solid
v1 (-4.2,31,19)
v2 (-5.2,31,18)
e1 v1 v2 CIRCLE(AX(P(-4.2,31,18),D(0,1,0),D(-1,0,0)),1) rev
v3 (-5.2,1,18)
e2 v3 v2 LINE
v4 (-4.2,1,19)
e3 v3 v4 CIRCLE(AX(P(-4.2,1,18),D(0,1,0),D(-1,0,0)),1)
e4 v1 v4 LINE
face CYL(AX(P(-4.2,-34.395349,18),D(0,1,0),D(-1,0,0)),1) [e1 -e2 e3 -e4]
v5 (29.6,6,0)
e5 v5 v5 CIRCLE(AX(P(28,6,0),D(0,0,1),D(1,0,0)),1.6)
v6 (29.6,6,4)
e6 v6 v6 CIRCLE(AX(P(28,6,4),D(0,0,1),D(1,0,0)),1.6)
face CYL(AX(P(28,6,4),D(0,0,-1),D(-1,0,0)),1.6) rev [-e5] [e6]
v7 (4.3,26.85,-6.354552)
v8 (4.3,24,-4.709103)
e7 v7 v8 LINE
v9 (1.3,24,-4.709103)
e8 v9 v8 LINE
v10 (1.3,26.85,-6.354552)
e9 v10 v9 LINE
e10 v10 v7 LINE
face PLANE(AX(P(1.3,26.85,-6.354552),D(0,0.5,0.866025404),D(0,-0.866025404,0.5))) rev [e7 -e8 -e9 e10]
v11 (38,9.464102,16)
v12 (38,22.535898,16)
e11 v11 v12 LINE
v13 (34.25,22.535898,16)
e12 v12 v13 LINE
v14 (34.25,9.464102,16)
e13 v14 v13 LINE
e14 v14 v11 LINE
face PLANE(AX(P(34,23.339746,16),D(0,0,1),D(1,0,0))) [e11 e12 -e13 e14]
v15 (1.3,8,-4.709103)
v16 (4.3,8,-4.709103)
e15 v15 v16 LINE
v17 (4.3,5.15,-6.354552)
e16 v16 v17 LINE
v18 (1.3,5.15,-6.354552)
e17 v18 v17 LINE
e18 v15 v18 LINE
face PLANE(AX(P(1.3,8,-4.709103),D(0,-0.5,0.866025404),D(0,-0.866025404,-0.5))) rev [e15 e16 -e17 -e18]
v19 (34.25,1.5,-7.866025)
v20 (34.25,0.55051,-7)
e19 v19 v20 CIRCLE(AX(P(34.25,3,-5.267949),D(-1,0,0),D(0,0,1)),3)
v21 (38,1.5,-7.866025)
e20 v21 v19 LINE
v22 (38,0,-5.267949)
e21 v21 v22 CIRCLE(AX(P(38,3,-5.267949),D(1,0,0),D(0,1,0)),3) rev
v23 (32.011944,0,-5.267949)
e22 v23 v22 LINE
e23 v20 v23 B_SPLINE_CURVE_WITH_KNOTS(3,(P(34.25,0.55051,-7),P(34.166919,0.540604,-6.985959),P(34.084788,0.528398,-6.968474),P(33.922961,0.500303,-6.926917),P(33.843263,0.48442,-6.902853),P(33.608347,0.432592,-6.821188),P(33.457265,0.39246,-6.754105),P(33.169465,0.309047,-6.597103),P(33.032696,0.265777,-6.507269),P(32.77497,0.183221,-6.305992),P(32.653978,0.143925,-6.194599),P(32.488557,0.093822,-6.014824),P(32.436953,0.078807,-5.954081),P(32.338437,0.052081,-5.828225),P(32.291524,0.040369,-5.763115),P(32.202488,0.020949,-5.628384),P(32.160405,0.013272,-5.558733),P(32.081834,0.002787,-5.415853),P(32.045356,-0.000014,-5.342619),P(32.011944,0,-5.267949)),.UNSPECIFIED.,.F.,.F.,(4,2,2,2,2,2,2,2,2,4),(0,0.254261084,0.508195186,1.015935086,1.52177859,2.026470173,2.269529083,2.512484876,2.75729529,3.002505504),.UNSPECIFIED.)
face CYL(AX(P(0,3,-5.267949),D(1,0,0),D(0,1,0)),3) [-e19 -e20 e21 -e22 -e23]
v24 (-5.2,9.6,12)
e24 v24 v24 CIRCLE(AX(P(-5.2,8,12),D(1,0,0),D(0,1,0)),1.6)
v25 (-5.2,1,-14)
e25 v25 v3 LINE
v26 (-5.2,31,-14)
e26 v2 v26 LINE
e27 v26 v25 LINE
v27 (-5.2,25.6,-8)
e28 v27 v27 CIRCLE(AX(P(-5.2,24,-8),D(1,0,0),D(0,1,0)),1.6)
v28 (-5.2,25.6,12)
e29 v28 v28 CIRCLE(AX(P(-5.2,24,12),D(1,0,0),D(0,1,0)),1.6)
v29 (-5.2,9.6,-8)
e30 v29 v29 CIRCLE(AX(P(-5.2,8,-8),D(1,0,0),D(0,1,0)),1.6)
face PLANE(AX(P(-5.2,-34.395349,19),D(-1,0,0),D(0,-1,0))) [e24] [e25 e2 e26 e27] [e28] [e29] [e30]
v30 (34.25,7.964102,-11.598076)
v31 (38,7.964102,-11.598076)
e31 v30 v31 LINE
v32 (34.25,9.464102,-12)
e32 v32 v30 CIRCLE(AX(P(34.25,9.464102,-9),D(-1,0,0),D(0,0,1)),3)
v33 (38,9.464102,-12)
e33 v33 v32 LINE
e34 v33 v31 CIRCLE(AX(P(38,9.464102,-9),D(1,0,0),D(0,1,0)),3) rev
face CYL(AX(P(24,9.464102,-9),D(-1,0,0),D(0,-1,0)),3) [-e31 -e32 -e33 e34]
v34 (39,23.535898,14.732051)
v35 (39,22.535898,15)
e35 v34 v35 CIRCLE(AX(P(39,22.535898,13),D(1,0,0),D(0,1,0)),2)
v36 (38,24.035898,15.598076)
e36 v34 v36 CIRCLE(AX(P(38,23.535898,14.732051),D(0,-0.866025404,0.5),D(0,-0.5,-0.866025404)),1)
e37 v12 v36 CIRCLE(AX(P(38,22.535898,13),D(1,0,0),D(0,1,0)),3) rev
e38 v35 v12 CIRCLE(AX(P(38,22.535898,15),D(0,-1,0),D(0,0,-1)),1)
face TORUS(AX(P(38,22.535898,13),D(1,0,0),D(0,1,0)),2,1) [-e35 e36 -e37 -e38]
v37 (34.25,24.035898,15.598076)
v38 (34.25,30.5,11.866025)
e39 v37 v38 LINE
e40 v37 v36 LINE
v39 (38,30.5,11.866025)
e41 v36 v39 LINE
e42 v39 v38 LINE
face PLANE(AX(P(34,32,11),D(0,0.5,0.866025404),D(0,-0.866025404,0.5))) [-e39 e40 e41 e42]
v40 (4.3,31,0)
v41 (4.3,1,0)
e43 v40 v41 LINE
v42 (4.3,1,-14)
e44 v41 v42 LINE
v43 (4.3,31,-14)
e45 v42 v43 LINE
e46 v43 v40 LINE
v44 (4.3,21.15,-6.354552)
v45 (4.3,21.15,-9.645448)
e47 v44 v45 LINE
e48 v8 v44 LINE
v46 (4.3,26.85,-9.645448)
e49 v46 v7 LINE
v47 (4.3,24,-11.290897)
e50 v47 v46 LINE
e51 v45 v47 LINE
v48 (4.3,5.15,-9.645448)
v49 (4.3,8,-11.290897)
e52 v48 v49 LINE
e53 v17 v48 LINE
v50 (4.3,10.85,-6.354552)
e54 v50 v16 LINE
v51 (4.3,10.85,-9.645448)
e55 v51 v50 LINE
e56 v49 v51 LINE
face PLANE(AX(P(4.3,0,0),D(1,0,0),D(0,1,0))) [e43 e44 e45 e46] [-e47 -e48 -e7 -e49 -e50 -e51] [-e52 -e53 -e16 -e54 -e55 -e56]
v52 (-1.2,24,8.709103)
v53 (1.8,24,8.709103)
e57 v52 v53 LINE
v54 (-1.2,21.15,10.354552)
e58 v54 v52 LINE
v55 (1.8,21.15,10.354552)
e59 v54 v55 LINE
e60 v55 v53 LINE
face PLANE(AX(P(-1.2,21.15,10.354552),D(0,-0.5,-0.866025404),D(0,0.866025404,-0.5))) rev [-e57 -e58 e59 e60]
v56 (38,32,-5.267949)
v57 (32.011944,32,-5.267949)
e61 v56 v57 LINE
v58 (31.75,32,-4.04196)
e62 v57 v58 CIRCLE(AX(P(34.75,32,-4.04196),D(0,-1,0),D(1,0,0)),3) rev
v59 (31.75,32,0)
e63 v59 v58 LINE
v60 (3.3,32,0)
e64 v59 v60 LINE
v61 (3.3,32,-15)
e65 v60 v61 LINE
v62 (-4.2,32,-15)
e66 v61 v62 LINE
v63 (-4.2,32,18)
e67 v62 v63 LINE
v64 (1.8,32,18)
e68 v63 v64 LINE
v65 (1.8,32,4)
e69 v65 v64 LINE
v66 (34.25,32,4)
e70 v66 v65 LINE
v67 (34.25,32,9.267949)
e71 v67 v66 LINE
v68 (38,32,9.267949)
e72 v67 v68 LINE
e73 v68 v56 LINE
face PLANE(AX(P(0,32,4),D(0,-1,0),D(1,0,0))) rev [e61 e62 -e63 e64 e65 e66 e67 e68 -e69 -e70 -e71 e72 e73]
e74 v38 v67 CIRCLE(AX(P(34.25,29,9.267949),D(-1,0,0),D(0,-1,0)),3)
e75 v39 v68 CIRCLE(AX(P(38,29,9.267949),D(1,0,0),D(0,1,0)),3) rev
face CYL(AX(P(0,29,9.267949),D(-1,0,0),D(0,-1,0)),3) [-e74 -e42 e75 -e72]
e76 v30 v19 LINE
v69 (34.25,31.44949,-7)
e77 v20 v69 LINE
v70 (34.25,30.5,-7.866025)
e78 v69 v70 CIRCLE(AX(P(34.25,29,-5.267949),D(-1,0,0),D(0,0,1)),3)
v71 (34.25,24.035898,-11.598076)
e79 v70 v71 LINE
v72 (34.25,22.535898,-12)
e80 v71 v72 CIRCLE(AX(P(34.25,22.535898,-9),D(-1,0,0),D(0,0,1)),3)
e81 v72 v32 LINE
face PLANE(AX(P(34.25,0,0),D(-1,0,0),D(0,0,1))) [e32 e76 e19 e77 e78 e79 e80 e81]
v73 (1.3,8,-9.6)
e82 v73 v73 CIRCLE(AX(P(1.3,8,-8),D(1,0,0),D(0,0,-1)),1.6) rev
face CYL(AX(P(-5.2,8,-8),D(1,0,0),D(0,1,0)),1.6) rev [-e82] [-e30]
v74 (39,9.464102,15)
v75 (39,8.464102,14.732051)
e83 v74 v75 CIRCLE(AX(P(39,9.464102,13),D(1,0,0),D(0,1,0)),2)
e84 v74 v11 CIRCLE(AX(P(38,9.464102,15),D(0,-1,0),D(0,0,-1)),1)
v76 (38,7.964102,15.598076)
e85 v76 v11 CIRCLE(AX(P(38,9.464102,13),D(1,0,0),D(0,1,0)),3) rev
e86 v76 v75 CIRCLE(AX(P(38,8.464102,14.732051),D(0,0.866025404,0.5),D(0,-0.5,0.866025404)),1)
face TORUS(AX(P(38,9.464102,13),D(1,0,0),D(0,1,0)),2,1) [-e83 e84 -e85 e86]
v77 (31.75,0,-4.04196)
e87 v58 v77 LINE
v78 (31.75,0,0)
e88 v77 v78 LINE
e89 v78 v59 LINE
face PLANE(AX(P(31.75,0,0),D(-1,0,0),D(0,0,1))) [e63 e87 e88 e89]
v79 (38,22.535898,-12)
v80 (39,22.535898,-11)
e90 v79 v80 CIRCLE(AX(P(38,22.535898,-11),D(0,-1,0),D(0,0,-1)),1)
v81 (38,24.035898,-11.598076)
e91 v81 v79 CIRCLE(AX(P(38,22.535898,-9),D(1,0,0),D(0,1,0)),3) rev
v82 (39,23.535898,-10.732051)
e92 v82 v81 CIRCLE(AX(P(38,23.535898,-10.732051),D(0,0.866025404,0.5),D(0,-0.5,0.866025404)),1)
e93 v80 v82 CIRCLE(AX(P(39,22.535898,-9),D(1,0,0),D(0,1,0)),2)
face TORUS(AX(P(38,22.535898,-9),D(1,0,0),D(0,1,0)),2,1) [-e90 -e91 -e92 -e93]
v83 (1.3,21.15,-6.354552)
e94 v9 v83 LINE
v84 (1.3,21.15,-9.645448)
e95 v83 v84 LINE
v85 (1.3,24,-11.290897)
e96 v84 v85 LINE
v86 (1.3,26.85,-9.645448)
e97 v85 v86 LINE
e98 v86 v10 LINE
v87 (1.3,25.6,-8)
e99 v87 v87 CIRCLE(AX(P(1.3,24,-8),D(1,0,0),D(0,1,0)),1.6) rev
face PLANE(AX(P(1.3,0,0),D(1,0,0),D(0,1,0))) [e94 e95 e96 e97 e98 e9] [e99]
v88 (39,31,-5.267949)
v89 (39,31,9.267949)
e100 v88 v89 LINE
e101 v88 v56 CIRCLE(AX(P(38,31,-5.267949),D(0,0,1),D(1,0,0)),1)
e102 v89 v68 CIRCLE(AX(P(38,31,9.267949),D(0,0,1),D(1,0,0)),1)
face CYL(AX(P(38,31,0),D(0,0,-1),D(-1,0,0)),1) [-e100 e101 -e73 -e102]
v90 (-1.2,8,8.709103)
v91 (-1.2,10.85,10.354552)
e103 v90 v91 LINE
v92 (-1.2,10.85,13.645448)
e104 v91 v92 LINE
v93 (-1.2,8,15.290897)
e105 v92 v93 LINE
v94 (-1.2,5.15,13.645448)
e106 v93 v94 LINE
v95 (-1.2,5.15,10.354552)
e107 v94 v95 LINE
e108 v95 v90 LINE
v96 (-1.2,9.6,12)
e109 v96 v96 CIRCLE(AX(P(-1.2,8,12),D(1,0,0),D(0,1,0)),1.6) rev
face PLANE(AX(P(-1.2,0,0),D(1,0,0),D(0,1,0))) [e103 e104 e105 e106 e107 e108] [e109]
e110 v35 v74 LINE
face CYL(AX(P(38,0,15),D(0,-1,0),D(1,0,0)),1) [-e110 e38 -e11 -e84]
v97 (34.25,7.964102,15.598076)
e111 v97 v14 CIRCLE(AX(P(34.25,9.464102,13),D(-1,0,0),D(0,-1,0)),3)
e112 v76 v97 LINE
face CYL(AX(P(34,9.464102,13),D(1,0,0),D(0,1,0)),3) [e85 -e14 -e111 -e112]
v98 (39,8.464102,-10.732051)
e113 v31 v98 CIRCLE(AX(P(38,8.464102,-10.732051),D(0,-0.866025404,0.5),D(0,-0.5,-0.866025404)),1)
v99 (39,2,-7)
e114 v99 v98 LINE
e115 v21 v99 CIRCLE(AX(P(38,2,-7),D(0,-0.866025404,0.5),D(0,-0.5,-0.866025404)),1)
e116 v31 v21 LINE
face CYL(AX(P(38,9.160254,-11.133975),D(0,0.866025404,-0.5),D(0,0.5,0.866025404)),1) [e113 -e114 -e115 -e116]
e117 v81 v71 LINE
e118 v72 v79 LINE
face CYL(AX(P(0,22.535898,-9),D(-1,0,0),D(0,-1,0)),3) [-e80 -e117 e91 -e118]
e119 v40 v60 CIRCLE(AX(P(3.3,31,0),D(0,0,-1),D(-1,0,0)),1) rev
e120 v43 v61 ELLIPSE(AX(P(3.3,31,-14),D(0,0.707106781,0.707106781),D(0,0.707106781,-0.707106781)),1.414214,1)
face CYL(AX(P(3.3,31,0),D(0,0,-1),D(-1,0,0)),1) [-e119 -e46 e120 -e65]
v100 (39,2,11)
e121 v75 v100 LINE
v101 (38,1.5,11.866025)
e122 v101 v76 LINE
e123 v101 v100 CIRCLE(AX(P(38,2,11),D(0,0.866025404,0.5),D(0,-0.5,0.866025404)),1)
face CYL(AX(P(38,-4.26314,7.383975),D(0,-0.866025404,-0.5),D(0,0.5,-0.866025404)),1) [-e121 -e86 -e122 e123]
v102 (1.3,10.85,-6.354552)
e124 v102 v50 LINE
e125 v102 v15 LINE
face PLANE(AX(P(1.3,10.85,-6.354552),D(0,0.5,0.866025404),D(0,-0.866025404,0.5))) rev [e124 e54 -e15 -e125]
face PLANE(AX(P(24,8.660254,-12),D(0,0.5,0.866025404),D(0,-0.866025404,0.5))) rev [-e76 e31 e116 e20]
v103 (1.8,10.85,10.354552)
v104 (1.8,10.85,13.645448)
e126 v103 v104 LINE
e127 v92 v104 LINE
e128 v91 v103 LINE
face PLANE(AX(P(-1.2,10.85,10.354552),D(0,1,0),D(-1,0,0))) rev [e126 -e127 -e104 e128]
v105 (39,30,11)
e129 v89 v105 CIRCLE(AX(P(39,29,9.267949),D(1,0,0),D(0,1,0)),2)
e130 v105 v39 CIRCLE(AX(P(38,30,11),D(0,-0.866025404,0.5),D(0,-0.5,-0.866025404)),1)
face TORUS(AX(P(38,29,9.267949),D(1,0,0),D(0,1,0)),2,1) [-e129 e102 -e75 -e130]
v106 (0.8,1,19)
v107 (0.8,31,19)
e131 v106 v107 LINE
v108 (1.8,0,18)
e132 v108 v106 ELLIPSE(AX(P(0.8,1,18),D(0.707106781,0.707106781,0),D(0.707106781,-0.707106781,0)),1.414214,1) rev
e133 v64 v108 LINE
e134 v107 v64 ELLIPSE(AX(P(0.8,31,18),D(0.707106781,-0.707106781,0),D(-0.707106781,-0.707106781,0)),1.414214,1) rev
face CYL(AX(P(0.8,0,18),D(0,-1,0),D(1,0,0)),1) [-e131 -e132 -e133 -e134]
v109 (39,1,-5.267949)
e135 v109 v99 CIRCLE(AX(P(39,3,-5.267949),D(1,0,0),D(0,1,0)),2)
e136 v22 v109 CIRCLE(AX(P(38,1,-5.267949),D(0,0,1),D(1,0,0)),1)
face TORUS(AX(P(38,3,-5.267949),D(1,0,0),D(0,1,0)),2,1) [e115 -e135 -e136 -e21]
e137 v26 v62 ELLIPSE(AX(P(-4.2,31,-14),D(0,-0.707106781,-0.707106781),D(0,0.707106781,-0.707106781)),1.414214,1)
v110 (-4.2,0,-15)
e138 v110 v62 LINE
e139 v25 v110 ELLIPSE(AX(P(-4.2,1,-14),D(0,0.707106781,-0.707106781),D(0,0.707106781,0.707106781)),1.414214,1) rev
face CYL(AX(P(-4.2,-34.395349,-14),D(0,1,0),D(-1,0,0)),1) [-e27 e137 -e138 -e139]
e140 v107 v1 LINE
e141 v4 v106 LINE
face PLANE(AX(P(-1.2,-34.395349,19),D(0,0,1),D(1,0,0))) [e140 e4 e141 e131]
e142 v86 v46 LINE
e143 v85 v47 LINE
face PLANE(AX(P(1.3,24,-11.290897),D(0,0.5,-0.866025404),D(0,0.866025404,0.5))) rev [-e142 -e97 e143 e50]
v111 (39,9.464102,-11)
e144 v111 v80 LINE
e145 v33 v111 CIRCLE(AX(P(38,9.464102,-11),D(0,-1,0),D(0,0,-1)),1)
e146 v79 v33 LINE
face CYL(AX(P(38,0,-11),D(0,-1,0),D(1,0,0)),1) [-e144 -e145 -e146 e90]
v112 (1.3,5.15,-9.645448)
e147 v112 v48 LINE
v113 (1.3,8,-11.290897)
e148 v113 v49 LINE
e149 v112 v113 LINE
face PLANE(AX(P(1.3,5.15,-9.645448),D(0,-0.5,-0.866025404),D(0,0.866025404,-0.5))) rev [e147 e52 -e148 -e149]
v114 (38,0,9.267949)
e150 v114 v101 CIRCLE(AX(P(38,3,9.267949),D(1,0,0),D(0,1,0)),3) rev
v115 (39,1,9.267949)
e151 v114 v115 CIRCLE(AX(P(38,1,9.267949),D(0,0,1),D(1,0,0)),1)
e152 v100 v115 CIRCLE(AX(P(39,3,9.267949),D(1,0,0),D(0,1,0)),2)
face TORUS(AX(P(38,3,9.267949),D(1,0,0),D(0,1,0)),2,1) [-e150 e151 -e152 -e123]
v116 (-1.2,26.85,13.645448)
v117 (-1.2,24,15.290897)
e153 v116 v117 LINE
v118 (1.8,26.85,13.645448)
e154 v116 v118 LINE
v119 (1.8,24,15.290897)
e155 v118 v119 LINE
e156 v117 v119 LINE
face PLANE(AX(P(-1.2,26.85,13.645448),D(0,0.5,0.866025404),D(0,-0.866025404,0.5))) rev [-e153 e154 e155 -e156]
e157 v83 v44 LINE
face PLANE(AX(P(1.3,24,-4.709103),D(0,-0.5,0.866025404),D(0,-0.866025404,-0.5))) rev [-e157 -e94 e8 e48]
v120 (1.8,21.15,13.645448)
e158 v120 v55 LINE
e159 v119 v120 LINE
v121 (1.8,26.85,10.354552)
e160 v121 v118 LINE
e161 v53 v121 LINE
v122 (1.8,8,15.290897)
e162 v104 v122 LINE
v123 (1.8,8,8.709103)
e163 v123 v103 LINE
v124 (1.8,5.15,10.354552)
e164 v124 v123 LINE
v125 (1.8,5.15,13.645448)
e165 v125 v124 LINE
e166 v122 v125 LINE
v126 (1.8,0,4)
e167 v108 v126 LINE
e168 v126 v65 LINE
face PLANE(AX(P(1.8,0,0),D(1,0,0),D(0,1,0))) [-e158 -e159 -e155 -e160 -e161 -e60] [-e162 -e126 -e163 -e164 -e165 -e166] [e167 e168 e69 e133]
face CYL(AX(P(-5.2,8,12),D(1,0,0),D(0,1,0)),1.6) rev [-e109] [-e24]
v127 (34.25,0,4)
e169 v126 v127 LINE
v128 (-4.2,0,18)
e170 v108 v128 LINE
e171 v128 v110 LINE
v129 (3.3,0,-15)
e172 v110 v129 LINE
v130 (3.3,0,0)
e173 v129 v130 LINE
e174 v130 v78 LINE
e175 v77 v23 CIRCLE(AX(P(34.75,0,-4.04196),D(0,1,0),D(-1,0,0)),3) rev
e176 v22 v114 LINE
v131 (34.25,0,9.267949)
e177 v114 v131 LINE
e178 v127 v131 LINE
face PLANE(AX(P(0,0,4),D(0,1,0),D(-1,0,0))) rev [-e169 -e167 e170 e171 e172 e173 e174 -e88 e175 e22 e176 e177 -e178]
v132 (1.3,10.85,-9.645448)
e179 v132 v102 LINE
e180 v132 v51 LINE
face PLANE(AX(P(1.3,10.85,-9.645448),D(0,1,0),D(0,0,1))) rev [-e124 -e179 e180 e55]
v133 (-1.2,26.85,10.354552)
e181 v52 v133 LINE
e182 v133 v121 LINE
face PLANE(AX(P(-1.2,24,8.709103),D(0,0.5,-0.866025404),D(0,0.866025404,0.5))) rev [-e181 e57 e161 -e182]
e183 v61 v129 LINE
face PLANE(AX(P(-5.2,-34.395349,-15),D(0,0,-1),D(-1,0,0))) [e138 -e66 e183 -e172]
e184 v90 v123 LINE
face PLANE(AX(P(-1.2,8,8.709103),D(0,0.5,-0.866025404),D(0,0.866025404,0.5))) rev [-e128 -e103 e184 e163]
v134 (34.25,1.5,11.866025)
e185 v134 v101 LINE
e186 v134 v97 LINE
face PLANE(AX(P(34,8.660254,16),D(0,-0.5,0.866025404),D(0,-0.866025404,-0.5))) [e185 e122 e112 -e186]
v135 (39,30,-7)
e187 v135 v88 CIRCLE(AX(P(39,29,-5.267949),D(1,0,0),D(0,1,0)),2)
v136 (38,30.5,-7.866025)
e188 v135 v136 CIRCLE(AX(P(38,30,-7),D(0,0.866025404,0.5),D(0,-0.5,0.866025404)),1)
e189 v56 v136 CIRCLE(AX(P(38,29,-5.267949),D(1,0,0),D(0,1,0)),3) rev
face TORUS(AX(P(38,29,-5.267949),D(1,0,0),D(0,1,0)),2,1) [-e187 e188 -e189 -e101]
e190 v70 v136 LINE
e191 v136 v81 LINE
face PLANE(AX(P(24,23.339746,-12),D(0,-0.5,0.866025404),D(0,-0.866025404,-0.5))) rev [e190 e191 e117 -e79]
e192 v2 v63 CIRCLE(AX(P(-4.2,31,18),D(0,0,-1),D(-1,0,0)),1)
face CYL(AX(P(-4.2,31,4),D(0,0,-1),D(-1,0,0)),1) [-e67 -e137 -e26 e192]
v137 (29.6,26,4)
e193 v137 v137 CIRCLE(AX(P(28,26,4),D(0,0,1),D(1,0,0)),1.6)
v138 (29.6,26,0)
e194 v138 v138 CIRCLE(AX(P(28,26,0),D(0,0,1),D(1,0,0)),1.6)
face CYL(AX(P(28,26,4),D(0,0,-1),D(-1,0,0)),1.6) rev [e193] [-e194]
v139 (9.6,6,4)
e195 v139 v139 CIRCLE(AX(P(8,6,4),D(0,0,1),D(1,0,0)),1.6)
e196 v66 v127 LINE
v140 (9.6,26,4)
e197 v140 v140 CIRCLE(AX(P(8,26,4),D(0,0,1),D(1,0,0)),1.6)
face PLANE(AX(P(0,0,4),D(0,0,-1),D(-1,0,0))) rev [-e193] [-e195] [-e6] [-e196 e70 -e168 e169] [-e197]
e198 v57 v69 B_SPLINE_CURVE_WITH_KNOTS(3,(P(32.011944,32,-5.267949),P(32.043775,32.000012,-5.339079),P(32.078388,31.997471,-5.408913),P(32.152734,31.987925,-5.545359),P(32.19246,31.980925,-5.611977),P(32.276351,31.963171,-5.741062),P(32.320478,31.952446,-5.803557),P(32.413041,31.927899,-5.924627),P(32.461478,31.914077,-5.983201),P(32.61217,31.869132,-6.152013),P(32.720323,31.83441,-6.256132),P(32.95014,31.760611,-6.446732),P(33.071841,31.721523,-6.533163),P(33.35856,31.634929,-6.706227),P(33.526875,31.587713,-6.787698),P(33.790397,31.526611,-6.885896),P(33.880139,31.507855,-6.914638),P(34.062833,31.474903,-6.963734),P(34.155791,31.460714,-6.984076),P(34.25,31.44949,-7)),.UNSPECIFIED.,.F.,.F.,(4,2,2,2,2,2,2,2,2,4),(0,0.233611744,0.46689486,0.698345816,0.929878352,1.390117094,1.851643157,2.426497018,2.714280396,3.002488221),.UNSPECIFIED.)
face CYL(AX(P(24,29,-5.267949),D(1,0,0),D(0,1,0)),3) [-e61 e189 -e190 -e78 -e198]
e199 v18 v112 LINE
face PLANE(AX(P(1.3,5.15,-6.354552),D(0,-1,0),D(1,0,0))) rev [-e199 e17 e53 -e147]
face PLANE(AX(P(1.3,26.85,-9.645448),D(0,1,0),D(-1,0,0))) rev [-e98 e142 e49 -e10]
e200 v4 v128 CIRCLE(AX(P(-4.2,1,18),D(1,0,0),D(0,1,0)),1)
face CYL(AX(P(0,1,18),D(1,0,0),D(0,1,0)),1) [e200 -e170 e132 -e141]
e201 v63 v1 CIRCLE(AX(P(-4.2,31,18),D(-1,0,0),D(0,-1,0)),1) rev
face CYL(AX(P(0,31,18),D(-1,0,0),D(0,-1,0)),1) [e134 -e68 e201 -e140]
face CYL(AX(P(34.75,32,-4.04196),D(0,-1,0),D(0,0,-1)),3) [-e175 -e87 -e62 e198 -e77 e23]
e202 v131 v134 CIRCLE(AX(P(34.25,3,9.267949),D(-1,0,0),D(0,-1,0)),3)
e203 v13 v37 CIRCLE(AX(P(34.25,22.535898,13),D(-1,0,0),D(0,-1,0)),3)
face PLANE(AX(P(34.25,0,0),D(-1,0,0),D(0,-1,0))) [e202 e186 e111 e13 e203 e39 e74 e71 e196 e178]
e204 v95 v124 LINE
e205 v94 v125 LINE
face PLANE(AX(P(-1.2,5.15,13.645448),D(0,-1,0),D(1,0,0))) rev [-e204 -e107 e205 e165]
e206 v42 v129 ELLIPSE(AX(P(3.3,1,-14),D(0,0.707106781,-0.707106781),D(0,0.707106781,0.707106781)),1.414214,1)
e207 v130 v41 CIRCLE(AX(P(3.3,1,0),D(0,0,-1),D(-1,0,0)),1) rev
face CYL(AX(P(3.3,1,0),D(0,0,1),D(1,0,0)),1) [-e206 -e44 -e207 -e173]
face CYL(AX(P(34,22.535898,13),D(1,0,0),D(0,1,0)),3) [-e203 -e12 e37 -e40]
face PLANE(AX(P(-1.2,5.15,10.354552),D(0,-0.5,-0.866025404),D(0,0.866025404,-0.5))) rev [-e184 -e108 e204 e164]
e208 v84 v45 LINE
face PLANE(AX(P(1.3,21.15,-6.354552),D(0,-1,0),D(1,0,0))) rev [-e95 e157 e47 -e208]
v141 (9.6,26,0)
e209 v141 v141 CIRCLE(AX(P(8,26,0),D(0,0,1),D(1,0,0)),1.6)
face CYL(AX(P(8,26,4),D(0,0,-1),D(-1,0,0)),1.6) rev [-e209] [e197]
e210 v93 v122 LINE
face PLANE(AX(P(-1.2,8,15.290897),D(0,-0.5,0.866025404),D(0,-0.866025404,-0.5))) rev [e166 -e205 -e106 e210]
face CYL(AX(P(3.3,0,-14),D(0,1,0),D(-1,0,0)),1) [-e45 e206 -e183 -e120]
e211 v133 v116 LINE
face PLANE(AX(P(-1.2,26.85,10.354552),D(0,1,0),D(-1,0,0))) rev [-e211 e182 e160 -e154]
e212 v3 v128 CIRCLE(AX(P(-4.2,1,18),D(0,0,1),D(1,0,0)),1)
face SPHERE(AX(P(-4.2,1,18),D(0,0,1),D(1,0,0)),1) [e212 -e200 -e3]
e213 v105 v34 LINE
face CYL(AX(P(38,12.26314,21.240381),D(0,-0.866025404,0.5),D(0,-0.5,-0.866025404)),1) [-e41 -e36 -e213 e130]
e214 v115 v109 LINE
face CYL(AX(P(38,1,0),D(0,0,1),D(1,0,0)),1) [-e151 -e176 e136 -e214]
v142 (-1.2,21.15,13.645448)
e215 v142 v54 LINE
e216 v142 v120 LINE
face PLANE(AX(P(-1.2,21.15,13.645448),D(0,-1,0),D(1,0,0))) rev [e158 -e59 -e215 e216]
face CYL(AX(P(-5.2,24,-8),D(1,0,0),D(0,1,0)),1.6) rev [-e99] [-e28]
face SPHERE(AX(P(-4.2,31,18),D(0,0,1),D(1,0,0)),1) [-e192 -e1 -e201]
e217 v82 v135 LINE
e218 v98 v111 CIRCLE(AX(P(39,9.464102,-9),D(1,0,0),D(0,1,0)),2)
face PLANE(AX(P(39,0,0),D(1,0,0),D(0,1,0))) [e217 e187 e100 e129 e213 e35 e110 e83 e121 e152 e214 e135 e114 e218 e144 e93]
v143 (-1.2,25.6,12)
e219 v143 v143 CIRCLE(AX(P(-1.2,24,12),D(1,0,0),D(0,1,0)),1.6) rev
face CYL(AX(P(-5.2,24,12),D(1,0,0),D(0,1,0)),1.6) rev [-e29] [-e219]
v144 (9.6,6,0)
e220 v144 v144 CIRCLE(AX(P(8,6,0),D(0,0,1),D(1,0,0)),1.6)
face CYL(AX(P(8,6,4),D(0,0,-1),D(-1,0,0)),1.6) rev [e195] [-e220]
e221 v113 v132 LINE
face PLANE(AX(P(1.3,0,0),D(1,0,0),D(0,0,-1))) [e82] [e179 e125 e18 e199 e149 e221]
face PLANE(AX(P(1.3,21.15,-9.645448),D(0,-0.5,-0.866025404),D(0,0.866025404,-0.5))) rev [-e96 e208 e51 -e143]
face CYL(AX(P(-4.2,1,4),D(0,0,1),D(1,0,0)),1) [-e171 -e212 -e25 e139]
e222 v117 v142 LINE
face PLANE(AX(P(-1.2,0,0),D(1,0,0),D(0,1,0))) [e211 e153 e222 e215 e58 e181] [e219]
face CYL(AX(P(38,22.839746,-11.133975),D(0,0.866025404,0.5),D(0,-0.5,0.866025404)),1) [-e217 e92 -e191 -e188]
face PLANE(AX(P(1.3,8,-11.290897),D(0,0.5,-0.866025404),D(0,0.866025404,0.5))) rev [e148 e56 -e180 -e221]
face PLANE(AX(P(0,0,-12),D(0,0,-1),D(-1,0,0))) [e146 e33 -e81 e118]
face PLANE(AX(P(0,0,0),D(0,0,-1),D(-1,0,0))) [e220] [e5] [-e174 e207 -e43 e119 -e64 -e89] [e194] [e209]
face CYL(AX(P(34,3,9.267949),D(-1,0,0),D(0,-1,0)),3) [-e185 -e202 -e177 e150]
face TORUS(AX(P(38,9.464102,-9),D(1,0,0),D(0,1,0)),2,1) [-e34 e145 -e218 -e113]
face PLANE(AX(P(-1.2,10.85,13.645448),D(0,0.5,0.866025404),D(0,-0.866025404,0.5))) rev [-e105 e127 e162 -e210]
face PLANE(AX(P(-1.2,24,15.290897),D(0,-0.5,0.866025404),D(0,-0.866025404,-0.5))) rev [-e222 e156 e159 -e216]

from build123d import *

# Parameters (mm, degrees)
SKETCH_1_W          = 36
SKETCH_1_H          = 32
SKETCH_1_R          = 1.6
EXTRUDE_1_DEPTH     = 4
EXTRUDE_2_DEPTH     = 32
SKETCH_8_R          = 1.6
CUT_EXTRUDE_1_DEPTH = 53.619768148
SKETCH1_W           = 4
SKETCH1_H           = 32
BOSS_EXTRUDE1_DEPTH = 3
SKETCH2_W           = 5
SKETCH2_H           = 32
BOSS_EXTRUDE2_DEPTH = 12
CUT_EXTRUDE1_DEPTH  = 5
BOSS_EXTRUDE5_DEPTH = 5
BOSS_EXTRUDE6_START = 3
SKETCH7_W           = 15
SKETCH7_H           = 32
SKETCH7_R           = 1.6
BOSS_EXTRUDE6_DEPTH = 3
CUT_EXTRUDE2_DEPTH  = 0.25
BOSS_EXTRUDE7_START = 2.5
SKETCH9_W           = 15
SKETCH9_H           = 32
SKETCH9_R           = 1.6
BOSS_EXTRUDE7_DEPTH = 2.5
BOSS_EXTRUDE8_DEPTH = 2.5
CUT_EXTRUDE3_DEPTH  = 2.5
FILLET2_R           = 3
FILLET4_R           = 3
FILLET5_R           = 3
FILLET9_R           = 1
FILLET11_R          = 1
CUT_EXTRUDE4_DEPTH  = 3
CUT_EXTRUDE5_DEPTH  = 3
FILLET14_R          = 1


with BuildPart() as part:
    # Эскиз1 → Бобышка-Вытянуть1 (new body)
    with BuildSketch(Plane.XY):
        with Locations((18, 16)):
            Rectangle(SKETCH_1_W, SKETCH_1_H)
        with Locations((8, 26)):
            Circle(SKETCH_1_R, mode=Mode.SUBTRACT)
        with Locations((28, 26)):
            Circle(SKETCH_1_R, mode=Mode.SUBTRACT)
        with Locations((8, 6)):
            Circle(SKETCH_1_R, mode=Mode.SUBTRACT)
        with Locations((28, 6)):
            Circle(SKETCH_1_R, mode=Mode.SUBTRACT)
    extrude(amount=EXTRUDE_1_DEPTH)

    # Эскиз7 → Бобышка-Вытянуть2 (add)
    with BuildSketch(Plane(origin=(0, 32, 0), x_dir=(1, 0, 0), z_dir=(0, 1, 0))):
        Polygon((0, 0), (-1.2, 0), (-1.2, 15), (-5.2, 15), (-5.2, -19), (-1.2, -19), (-1.2, -4), (0, -4), align=None)
    extrude(amount=-EXTRUDE_2_DEPTH)

    # Эскиз8 → Вырез-Вытянуть1 (cut, through all)
    with BuildSketch(Plane(origin=(-1.2, 0, 0), x_dir=(0, 0, -1), z_dir=(1, 0, 0))):
        with Locations(Location((8, 24, 0), (0, 0, 90))):
            Circle(SKETCH_8_R)
        with Locations(Location((8, 8, 0), (0, 0, 90))):
            Circle(SKETCH_8_R)
        with Locations(Location((-12, 8, 0), (0, 0, 90))):
            Circle(SKETCH_8_R)
        with Locations(Location((-12, 24, 0), (0, 0, 90))):
            Circle(SKETCH_8_R)
    extrude(amount=-CUT_EXTRUDE_1_DEPTH, mode=Mode.SUBTRACT)

    # Sketch1 → Boss-Extrude1 (add)
    with BuildSketch(Plane(origin=(36, 0, 0), x_dir=(0, 0, -1), z_dir=(1, 0, 0))):
        with Locations((-2, 16)):
            Rectangle(SKETCH1_W, SKETCH1_H)
    extrude(amount=BOSS_EXTRUDE1_DEPTH)

    # Sketch2 → Boss-Extrude2 (add)
    with BuildSketch(Plane(origin=(0, 0, 0), x_dir=(-1, 0, 0), z_dir=(0, 0, -1))):
        with Locations((-36.5, 16)):
            Rectangle(SKETCH2_W, SKETCH2_H)
    extrude(amount=BOSS_EXTRUDE2_DEPTH)

    # Sketch3 → Cut-Extrude1 (cut)
    with BuildSketch(Plane(origin=(39, 0, 0), x_dir=(0, 0, -1), z_dir=(1, 0, 0))):
        Polygon((7, 32), (12, 32), (12, 23.339745962), align=None)
        Polygon((12, 8.660254038), (7, 0), (12, 0), align=None)
    extrude(amount=-CUT_EXTRUDE1_DEPTH, mode=Mode.SUBTRACT)

    # Sketch6 → Boss-Extrude5 (add)
    with BuildSketch(Plane(origin=(39, 0, 0), x_dir=(0, 0, -1), z_dir=(1, 0, 0))):
        Polygon((-16, 8.660254038), (-11, 0), (-4, 0), (-4, 32), (-11, 32), (-16, 23.339745962), align=None)
    extrude(amount=-BOSS_EXTRUDE5_DEPTH)

    # Sketch7 → Boss-Extrude6 (add)
    # profile 1 of 2: a face of its own
    with BuildSketch(Plane(origin=(-1.2, 0, 0), x_dir=(0, 0, -1), z_dir=(1, 0, 0)).offset(BOSS_EXTRUDE6_START)):
        with Locations((7.5, 16)):
            Rectangle(SKETCH7_W, SKETCH7_H)
        with Locations(Location((8, 24, 0), (0, 0, 90))):
            Circle(SKETCH7_R, mode=Mode.SUBTRACT)
        with Locations(Location((8, 8, 0), (0, 0, 90))):
            Circle(SKETCH7_R, mode=Mode.SUBTRACT)
    # profile 2 of 2: a face of its own
    with BuildSketch(Plane(origin=(-1.2, 0, 0), x_dir=(0, 0, -1), z_dir=(1, 0, 0)).offset(BOSS_EXTRUDE6_START)):
        with Locations((-11.5, 16)):
            Rectangle(SKETCH7_W, SKETCH7_H)
        with Locations(Location((-12, 24, 0), (0, 0, 90))):
            Circle(SKETCH7_R, mode=Mode.SUBTRACT)
        with Locations(Location((-12, 8, 0), (0, 0, 90))):
            Circle(SKETCH7_R, mode=Mode.SUBTRACT)
    extrude(amount=-BOSS_EXTRUDE6_DEPTH)

    # Sketch8 → Cut-Extrude2 (cut)
    with BuildSketch(Plane.ZY.offset(-34)):
        Polygon((-12, 23.339745962), (-12, 8.660254038), (-7, 0), (0, 0), (0, 32), (-7, 32), align=None)
        Polygon((4, 32), (4, 0), (11, 0), (16, 8.660254038), (16, 23.339745962), (11, 32), align=None)
    extrude(amount=-CUT_EXTRUDE2_DEPTH, mode=Mode.SUBTRACT)

    # Sketch9 → Boss-Extrude7 (add)
    with BuildSketch(Plane(origin=(1.8, 0, 0), x_dir=(0, 0, -1), z_dir=(1, 0, 0)).offset(BOSS_EXTRUDE7_START)):
        with Locations((7.5, 16)):
            Rectangle(SKETCH9_W, SKETCH9_H)
        with Locations(Location((8, 24, 0), (0, 0, 90))):
            Circle(SKETCH9_R, mode=Mode.SUBTRACT)
        with Locations(Location((8, 8, 0), (0, 0, 90))):
            Circle(SKETCH9_R, mode=Mode.SUBTRACT)
    extrude(amount=-BOSS_EXTRUDE7_DEPTH)

    # Sketch10 → Boss-Extrude8 (add)
    with BuildSketch(Plane.ZY.offset(-34.25)):
        Polygon((-7, 32), (-12, 23.339745962), (-12, 8.660254038), (-7, 0), (0, 0), (0, 32), align=None)
    extrude(amount=BOSS_EXTRUDE8_DEPTH)

    # Sketch11 → Cut-Extrude3 (cut)
    with BuildSketch(Plane.ZY.offset(-31.75)):
        Polygon((-7, 32), (-12, 23.339745962), (-12, 8.660254038), (-7, 0), align=None)
    extrude(amount=-CUT_EXTRUDE3_DEPTH, mode=Mode.SUBTRACT)

    # Fillet2
    # the kernel refuses this fillet: 3 mm, written as the material it takes off along each edge
    with BuildSketch(Plane(origin=(31.75, -7.395099729, -7), x_dir=(1, 0, 0), z_dir=(0, 1, 0))) as fillet2_piece_1:
        with BuildLine():
            CenterArc((3, -2.958039892), FILLET2_R, 99.594068227, 80.405931773)
            Line((0, -2.958039892), (-0.06, -2.958039892))
            Line((-0.06, -2.958039892), (-0.06, 0))
            Line((-0.06, 0), (0, 0.06))
            ThreePointArc((0, 0.06), (1.25, 0.06), (2.49, 0.059160798))
            Line((2.49, 0.059160798), (2.5, 0))
        make_face()
    extrude(amount=46.790199458, mode=Mode.SUBTRACT)

    # Fillet4
    fillet4_edges = [part.edges().sort_by_distance(p)[0] for p in [
        (36.625, 32, -7),
        (36.625, 0, -7),
        (36.625, 8.660254038, -12),
        (36.625, 23.339745962, -12),
    ]]
    fillet(fillet4_edges, radius=FILLET4_R)

    # Fillet5
    fillet5_edges = [part.edges().sort_by_distance(p)[0] for p in [
        (36.625, 32, 11),
        (36.625, 23.339745962, 16),
        (36.625, 8.660254038, 16),
        (36.625, 0, 11),
    ]]
    fillet(fillet5_edges, radius=FILLET5_R)

    # Fillet9
    fillet9_edges = [part.edges().sort_by_distance(p)[0] for p in [
        (39, 4.732050808, -9.732050808),
        (39, 16, -12),
        (39, 27.267949192, -9.732050808),
        (39, 32, 2),
        (39, 31.598076211, -6.767949192),
        (39, 23.31235552, -11.897777479),
        (39, 8.68764448, -11.897777479),
        (39, 0.401923789, -6.767949192),
        (39, 4.732050808, 13.732050808),
        (39, 0, 2),
        (39, 27.267949192, 13.732050808),
        (39, 16, 16),
        (39, 31.598076211, 10.767949192),
        (39, 23.31235552, 15.897777479),
        (39, 8.68764448, 15.897777479),
        (39, 0.401923789, 10.767949192),
    ]]
    fillet(fillet9_edges, radius=FILLET9_R)

    # Fillet11
    fillet11_edges = [part.edges().sort_by_distance(p)[0] for p in [
        (1.8, 16, 19),
        (-5.2, 16, 19),
        (-1.7, 32, 19),
        (-1.7, 0, 19),
    ]]
    fillet(fillet11_edges, radius=FILLET11_R)

    # Sketch12 → Cut-Extrude4 (cut)
    with BuildSketch(Plane(origin=(4.3, 0, 0), x_dir=(0, 0, -1), z_dir=(1, 0, 0))):
        Polygon((6.354551733, 26.85), (4.709103466, 24), (6.354551733, 21.15), (9.645448267, 21.15), (11.290896534, 24), (9.645448267, 26.85), align=None)
        Polygon((6.354551733, 10.85), (4.709103466, 8), (6.354551733, 5.15), (9.645448267, 5.15), (11.290896534, 8), (9.645448267, 10.85), align=None)
    extrude(amount=-CUT_EXTRUDE4_DEPTH, mode=Mode.SUBTRACT)

    # Sketch13 → Cut-Extrude5 (cut)
    with BuildSketch(Plane(origin=(1.8, 0, 0), x_dir=(0, 0, -1), z_dir=(1, 0, 0))):
        Polygon((-15.290896534, 24), (-13.645448267, 21.15), (-10.354551733, 21.15), (-8.709103466, 24), (-10.354551733, 26.85), (-13.645448267, 26.85), align=None)
        Polygon((-15.290896534, 8), (-13.645448267, 5.15), (-10.354551733, 5.15), (-8.709103466, 8), (-10.354551733, 10.85), (-13.645448267, 10.85), align=None)
    extrude(amount=-CUT_EXTRUDE5_DEPTH, mode=Mode.SUBTRACT)

    # Fillet14
    # the kernel refuses this fillet: 1 mm, written as the material it takes off along each edge
    with BuildSketch(Plane(origin=(-4.2, 1, 18), x_dir=(-1, 0, 0), z_dir=(0, -1, 0))) as fillet14_piece_1_section:
        Polygon((0, 0), (FILLET14_R, 0), (FILLET14_R, -FILLET14_R), (0, -FILLET14_R), align=None)
    fillet14_piece_1 = extrude(amount=FILLET14_R, mode=Mode.PRIVATE)
    fillet14_piece_1 = fillet14_piece_1 - Plane(origin=(-4.2, 1, 18), x_dir=(0.7071067811865475, 0, -0.7071067811865475), z_dir=(0, -1, 0)) * Sphere(FILLET14_R, mode=Mode.PRIVATE)
    add(fillet14_piece_1, mode=Mode.SUBTRACT)
    with BuildSketch(Plane(origin=(-4.2, 31, 18), x_dir=(0, 1, 0), z_dir=(-1, 0, 0))) as fillet14_piece_2_section:
        Polygon((0, 0), (FILLET14_R, 0), (FILLET14_R, -FILLET14_R), (0, -FILLET14_R), align=None)
    fillet14_piece_2 = extrude(amount=FILLET14_R, mode=Mode.PRIVATE)
    fillet14_piece_2 = fillet14_piece_2 - Plane(origin=(-4.2, 31, 18), x_dir=(0, -0.7071067811865475, -0.7071067811865475), z_dir=(-1, 0, 0)) * Sphere(FILLET14_R, mode=Mode.PRIVATE)
    add(fillet14_piece_2, mode=Mode.SUBTRACT)
    with BuildSketch(Plane(origin=(4.3, 32, -17.5), x_dir=(0, -1, 0), z_dir=(0, 0, 1))) as fillet14_piece_3:
        with BuildLine():
            CenterArc((FILLET14_R, -FILLET14_R), FILLET14_R, 90, 90)
            Line((0, -FILLET14_R), (0, 0))
            Line((0, 0), (FILLET14_R, 0))
        make_face()
    extrude(amount=17.5, mode=Mode.SUBTRACT)
    with BuildSketch(Plane(origin=(4.3, 0, 0), x_dir=(-1, 0, 0), z_dir=(0, 0, -1))) as fillet14_piece_4:
        with BuildLine():
            CenterArc((FILLET14_R, FILLET14_R), FILLET14_R, 180, 90)
            Line((0, FILLET14_R), (0, 0))
            Line((0, 0), (FILLET14_R, 0))
        make_face()
    extrude(amount=17.5, mode=Mode.SUBTRACT)
    with BuildSketch(Plane(origin=(4.3, -2.5, -15), x_dir=(-1, 0, 0), z_dir=(0, 1, 0))) as fillet14_piece_5:
        with BuildLine():
            CenterArc((FILLET14_R, FILLET14_R), FILLET14_R, 180, 90)
            Line((0, FILLET14_R), (0, 0))
            Line((0, 0), (FILLET14_R, 0))
        make_face()
    extrude(amount=37, mode=Mode.SUBTRACT)
    with BuildSketch(Plane(origin=(-5.2, 34.5, -15), x_dir=(0, 0, 1), z_dir=(0, -1, 0))) as fillet14_piece_6:
        with BuildLine():
            CenterArc((FILLET14_R, -FILLET14_R), FILLET14_R, 90, 90)
            Line((0, -FILLET14_R), (0, 0))
            Line((0, 0), (FILLET14_R, 0))
        make_face()
    extrude(amount=37, mode=Mode.SUBTRACT)
    with BuildSketch(Plane(origin=(-5.2, 32, -17.5), x_dir=(0, -1, 0), z_dir=(0, 0, 1)), Plane(origin=(-5.2, 0, -17.5), x_dir=(1, 0, 0), z_dir=(0, 0, 1))) as fillet14_piece_7:
        with BuildLine():
            CenterArc((FILLET14_R, FILLET14_R), FILLET14_R, 180, 90)
            Line((0, FILLET14_R), (0, 0))
            Line((0, 0), (FILLET14_R, 0))
        make_face()
    extrude(amount=35.5, mode=Mode.SUBTRACT)


solid = part.part
